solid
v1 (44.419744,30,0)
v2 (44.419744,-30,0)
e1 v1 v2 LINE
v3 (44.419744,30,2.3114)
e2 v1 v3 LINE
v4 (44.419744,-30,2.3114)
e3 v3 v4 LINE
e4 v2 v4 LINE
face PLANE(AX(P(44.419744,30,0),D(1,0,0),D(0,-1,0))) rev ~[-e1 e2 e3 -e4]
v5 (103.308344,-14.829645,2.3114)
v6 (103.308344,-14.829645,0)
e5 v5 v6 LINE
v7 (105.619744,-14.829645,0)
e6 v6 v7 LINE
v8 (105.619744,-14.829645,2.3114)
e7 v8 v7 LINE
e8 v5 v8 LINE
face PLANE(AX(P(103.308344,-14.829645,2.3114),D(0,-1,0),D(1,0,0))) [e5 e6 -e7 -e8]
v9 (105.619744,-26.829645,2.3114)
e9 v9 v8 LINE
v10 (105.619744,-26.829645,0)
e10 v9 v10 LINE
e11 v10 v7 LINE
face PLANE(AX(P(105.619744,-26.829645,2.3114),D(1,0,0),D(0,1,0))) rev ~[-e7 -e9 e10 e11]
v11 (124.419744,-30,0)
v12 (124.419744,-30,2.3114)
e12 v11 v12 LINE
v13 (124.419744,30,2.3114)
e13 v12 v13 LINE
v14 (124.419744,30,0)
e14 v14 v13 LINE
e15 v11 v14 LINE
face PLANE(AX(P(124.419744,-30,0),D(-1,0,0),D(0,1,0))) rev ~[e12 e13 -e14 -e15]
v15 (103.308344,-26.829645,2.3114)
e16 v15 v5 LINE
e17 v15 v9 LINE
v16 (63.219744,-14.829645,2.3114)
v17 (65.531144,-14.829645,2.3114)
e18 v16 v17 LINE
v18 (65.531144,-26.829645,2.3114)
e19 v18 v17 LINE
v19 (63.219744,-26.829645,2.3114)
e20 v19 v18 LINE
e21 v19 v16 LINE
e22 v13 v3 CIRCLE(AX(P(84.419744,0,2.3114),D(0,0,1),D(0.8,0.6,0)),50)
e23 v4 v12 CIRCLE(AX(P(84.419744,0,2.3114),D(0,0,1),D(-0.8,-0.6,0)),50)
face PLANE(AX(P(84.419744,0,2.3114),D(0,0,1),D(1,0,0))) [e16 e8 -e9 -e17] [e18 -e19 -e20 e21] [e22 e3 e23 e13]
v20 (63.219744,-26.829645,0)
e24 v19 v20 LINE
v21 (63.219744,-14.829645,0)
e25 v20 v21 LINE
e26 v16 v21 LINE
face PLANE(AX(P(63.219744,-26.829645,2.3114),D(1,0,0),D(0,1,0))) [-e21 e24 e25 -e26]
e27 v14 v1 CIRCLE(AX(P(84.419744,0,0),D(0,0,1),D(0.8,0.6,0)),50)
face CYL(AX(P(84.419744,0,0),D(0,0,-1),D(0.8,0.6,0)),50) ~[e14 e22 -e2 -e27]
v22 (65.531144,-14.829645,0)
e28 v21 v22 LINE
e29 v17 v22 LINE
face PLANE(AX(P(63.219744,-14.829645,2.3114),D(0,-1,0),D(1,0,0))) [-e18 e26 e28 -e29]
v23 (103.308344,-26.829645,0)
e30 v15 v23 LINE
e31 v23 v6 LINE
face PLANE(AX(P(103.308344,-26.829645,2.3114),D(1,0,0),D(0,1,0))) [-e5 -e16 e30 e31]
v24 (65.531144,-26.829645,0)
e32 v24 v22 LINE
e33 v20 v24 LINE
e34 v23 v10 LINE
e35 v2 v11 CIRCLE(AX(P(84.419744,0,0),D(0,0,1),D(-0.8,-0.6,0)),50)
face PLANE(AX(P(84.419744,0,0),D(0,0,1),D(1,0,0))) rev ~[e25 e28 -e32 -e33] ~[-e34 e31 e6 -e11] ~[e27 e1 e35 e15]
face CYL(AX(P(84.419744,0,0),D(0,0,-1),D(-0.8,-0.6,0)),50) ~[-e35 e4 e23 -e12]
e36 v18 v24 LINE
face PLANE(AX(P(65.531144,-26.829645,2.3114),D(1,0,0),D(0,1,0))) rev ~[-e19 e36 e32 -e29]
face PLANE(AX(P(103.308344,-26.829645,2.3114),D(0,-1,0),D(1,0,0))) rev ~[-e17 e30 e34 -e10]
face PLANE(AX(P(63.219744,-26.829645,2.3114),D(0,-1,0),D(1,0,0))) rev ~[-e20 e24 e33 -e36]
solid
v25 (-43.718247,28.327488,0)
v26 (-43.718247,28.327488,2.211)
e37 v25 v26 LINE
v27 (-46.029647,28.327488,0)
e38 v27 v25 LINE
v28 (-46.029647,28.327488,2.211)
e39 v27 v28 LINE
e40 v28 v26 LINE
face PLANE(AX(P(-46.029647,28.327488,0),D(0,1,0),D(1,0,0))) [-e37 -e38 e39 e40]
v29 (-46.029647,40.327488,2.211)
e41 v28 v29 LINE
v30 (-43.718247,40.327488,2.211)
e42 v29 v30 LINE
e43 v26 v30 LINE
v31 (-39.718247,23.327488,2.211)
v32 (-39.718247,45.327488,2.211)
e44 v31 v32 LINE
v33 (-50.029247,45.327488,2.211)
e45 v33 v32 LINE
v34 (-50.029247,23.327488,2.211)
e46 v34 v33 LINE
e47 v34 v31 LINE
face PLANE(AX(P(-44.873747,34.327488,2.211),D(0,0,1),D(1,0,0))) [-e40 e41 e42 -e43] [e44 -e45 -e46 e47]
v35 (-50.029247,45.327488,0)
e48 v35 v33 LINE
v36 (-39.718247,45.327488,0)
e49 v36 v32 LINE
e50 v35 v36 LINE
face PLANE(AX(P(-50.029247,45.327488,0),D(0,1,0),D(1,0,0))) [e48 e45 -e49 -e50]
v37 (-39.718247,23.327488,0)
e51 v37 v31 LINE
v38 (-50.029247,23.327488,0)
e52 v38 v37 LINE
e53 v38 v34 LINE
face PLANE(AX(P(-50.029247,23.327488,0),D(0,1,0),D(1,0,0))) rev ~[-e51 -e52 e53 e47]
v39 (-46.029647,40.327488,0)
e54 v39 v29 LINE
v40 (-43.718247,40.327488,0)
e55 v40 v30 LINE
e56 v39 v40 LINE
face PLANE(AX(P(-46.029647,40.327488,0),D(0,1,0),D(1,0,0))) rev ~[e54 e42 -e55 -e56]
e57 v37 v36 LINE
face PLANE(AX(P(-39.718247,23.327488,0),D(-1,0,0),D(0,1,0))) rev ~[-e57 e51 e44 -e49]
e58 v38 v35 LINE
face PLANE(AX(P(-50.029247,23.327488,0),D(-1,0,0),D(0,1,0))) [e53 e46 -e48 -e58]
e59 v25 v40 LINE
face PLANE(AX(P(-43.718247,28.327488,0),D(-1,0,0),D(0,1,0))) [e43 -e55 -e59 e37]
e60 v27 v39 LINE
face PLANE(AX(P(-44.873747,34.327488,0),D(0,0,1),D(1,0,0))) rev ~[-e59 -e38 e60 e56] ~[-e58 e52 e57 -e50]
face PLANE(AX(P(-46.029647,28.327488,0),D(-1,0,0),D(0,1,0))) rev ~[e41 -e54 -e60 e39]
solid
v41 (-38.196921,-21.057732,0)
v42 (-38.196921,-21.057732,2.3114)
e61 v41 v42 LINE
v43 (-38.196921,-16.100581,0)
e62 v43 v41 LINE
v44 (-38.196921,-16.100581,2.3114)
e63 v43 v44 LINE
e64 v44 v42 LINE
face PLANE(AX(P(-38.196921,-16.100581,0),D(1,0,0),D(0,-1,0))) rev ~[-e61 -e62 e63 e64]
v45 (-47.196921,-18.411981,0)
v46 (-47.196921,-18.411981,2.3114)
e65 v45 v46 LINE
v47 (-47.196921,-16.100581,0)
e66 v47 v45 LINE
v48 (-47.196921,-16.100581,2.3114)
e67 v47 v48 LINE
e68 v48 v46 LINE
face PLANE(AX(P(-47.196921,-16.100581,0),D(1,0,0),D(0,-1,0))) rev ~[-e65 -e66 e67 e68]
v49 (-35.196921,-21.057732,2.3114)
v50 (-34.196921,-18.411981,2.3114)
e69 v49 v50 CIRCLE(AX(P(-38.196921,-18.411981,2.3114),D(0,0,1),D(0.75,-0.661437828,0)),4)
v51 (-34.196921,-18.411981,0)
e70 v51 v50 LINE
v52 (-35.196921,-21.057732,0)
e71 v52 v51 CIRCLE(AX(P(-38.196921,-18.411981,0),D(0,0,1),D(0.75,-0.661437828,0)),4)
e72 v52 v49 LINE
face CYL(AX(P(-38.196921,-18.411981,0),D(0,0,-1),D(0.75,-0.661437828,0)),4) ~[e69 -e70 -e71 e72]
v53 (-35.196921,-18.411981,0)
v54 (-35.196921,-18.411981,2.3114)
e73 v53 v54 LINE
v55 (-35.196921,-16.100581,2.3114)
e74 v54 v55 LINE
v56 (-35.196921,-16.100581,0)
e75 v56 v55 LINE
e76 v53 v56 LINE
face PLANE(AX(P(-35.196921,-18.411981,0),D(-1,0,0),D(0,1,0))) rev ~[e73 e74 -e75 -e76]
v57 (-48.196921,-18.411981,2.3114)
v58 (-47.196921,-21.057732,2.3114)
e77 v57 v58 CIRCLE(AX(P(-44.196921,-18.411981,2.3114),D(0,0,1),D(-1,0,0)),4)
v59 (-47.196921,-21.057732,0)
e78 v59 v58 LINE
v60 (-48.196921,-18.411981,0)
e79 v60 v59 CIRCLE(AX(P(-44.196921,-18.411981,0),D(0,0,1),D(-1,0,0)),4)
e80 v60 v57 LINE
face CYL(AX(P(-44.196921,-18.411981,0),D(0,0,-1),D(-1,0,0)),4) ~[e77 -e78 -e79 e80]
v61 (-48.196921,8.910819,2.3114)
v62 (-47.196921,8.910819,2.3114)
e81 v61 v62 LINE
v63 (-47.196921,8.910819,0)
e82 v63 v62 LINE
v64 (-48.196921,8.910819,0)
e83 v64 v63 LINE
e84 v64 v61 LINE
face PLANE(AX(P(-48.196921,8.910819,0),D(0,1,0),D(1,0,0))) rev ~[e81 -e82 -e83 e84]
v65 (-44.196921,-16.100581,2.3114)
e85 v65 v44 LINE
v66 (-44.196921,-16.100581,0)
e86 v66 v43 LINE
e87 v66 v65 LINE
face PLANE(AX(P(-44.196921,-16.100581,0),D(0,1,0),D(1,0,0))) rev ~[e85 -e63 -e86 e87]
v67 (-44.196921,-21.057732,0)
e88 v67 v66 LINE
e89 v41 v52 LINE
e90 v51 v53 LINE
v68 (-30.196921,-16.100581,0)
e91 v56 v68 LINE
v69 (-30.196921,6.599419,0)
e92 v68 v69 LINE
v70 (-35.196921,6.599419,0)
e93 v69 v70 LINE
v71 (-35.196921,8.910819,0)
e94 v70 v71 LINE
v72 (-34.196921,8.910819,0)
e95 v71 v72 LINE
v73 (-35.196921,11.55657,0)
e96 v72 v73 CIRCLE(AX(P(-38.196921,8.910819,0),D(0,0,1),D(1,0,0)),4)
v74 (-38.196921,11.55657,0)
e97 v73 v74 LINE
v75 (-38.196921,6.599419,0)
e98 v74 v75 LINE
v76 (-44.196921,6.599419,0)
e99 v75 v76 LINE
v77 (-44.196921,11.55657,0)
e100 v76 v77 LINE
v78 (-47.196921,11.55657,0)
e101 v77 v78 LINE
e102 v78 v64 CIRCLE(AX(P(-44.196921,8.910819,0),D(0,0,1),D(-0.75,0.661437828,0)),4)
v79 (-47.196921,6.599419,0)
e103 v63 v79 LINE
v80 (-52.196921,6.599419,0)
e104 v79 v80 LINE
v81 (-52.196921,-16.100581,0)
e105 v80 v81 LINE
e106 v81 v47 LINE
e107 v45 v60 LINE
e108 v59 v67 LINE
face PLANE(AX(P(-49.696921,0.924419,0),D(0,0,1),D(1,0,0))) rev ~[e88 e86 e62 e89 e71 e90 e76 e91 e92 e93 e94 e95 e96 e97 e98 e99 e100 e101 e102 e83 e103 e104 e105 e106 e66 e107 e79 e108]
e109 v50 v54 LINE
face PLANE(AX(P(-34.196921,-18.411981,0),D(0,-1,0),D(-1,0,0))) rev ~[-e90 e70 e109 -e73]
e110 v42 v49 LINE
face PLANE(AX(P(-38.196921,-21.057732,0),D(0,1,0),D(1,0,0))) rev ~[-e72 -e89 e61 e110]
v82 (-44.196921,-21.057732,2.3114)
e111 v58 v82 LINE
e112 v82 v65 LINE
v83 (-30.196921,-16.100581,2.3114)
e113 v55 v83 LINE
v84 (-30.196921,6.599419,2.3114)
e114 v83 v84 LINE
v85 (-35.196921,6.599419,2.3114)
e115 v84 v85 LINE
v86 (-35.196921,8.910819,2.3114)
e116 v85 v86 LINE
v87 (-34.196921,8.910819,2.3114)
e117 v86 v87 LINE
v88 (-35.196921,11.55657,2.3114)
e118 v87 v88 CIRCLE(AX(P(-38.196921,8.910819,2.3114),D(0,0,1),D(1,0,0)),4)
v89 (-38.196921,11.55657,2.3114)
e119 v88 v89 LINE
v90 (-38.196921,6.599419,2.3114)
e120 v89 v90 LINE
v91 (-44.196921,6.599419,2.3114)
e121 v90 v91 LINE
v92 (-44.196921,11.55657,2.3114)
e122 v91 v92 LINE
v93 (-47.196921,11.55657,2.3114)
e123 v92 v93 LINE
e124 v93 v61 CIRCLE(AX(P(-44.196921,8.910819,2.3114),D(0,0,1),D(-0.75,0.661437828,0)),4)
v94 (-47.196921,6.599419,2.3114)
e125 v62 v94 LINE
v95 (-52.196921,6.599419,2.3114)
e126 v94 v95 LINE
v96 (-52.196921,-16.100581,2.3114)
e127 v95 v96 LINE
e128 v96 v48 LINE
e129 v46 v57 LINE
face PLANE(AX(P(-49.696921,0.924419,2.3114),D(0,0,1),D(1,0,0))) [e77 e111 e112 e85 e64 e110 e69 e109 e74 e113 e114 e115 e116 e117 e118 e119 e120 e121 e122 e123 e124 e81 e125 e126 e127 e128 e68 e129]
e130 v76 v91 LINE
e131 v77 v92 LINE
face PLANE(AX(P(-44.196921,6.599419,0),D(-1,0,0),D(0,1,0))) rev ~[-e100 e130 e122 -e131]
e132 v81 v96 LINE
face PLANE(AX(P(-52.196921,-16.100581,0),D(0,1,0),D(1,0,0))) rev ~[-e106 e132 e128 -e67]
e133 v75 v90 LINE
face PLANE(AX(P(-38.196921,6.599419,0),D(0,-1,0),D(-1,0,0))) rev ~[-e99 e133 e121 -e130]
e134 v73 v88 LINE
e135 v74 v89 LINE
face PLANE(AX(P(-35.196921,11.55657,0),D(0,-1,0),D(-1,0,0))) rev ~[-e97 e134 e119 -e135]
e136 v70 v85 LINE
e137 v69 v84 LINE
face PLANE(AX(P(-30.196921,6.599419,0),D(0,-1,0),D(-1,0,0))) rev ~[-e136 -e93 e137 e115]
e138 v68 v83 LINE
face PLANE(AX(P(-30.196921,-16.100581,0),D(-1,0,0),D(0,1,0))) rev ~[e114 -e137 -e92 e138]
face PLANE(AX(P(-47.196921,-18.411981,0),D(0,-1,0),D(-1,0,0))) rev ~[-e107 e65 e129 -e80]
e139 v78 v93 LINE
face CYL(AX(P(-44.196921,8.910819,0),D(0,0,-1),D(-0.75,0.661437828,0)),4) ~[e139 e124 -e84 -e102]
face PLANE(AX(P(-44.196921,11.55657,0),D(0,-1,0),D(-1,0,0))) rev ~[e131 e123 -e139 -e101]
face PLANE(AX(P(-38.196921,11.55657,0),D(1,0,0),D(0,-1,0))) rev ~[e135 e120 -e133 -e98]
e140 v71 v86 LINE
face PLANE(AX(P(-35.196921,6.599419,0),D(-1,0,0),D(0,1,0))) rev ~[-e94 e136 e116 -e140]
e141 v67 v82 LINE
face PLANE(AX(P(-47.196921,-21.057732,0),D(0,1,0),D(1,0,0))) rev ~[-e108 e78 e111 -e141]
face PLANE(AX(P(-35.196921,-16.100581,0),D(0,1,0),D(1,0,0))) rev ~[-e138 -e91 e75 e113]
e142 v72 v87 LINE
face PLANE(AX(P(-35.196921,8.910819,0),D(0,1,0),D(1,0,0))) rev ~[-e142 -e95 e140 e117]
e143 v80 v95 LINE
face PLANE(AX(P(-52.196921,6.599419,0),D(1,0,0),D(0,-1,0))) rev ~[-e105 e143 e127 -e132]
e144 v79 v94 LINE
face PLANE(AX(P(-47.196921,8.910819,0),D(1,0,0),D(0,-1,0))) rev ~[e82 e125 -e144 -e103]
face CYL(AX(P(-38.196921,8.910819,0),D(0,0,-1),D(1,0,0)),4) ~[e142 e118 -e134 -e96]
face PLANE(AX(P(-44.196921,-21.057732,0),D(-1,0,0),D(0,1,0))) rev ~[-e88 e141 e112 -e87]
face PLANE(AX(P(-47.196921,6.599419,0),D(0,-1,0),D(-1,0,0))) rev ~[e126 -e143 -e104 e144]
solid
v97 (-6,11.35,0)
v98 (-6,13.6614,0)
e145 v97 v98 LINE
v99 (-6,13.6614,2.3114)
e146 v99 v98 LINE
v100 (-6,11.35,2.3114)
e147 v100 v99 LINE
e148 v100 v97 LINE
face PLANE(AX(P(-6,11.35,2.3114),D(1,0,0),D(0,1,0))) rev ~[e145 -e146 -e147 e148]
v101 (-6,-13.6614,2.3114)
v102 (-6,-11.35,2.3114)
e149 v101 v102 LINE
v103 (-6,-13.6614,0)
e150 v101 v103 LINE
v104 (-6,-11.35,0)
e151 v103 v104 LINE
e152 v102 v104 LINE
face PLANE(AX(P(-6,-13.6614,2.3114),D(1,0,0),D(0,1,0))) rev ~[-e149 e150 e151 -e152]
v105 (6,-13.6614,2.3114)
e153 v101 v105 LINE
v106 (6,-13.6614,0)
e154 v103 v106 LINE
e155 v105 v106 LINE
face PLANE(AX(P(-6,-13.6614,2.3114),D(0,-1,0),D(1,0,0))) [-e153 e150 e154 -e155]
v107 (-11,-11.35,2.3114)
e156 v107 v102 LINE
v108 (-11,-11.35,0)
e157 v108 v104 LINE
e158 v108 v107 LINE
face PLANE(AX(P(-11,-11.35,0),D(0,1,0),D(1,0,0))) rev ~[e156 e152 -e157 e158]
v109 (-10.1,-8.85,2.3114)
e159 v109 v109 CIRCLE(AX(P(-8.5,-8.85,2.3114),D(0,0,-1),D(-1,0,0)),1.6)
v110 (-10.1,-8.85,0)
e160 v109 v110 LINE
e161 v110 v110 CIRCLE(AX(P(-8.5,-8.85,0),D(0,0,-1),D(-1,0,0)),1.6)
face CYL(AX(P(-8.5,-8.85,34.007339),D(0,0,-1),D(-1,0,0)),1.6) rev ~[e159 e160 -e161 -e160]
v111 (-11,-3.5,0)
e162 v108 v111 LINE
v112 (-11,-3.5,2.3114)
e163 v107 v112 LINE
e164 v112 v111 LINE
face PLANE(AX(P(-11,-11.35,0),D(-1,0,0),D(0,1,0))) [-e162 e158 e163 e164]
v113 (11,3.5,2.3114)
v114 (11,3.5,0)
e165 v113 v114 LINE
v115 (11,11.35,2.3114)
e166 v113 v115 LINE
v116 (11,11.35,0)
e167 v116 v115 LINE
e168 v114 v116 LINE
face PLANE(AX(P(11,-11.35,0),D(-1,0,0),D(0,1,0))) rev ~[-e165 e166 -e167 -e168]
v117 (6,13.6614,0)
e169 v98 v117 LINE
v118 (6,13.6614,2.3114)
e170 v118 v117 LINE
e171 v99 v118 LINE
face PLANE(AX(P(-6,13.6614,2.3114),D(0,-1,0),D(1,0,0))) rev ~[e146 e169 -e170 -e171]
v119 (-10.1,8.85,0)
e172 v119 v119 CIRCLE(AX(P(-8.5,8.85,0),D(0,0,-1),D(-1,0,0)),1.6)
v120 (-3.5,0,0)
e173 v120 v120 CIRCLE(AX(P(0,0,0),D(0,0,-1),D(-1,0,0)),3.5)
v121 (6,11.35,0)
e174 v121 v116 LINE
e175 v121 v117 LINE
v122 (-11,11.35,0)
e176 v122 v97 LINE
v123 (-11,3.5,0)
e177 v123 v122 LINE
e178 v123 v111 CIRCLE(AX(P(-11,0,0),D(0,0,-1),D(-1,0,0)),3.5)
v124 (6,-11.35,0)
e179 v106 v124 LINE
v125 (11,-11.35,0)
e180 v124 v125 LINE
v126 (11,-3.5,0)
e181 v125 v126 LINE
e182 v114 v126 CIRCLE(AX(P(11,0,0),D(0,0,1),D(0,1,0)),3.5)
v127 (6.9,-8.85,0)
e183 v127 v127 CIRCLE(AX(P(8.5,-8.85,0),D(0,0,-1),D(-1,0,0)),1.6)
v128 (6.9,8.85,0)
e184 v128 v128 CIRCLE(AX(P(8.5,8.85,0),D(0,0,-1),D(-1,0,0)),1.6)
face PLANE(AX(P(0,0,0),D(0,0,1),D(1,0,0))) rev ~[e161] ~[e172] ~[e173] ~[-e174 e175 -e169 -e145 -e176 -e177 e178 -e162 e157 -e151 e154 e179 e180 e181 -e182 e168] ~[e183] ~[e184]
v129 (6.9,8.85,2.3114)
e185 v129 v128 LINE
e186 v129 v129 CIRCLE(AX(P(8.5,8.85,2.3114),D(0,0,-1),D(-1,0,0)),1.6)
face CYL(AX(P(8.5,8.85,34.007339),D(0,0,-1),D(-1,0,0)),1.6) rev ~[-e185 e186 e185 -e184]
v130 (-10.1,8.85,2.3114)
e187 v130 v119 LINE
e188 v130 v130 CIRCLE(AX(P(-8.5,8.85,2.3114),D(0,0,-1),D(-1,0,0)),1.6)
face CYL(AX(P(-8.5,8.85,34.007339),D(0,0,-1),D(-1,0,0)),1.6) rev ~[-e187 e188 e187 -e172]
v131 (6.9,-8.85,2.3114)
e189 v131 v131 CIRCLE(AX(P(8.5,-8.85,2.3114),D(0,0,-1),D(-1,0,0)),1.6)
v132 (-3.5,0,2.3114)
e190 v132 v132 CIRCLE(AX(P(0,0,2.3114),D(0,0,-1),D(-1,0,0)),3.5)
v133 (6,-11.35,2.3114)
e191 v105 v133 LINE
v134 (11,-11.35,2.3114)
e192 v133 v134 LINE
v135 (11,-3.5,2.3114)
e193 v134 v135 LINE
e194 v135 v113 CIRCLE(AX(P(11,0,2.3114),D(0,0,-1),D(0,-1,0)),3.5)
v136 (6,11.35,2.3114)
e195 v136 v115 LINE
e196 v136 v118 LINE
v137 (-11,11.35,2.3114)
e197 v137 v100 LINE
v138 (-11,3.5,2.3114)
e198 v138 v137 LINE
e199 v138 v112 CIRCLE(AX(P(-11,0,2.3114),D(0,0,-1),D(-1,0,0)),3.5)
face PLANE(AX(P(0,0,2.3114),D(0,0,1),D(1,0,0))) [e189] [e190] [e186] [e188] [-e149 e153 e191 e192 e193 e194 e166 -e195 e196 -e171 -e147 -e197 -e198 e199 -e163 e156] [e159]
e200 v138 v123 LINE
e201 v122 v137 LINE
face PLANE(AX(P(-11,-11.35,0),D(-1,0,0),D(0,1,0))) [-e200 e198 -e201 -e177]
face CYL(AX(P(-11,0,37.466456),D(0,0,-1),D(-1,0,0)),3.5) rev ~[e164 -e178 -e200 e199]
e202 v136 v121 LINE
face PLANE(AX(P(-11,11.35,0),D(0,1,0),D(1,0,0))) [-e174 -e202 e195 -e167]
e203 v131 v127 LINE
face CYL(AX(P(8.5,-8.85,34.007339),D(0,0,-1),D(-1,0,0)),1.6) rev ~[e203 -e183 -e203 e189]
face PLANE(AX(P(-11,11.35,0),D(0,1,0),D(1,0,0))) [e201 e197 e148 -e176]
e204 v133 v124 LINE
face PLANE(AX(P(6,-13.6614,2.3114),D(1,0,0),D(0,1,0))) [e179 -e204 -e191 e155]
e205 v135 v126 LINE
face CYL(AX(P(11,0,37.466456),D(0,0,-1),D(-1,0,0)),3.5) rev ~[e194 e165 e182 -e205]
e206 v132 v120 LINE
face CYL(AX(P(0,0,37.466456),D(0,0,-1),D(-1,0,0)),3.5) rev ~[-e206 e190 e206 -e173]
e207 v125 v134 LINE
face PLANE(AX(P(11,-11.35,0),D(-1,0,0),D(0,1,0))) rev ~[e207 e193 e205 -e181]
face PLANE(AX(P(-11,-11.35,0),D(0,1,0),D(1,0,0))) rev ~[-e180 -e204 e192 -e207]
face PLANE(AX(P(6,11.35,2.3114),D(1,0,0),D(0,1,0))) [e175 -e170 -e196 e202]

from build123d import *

# Parameters (mm, degrees)
F0_W      = 22
F0_H      = 22.7
F1_DEPTH  = 2.3114
F3_D      = 3.2
F4_W      = 12
F4_H      = 2.3114
F5_DEPTH  = 2.3114
F8_D      = 7
F10_DEPTH = 2.3114
F11_W     = 2.3114
F11_H     = 12
F12_DEPTH = 2.3124
F13_W     = 5
F13_H     = 11.35
F13_W_2   = 3
F14_DEPTH = 2.3114
F15_W     = 10.311
F15_H     = 22
F15_W_2   = 2.3114
F15_H_2   = 12
F16_DEPTH = 2.211


# Not quite as in the source:
# - a feature names something its author has since deleted; it is built from what else it names


with BuildPart() as f1:
    # F0 (on Top) → F1 (new body)
    with BuildSketch(Plane.XY):
        Rectangle(F0_W, F0_H)
    extrude(amount=F1_DEPTH)

    # F3 (through all)
    with Locations(Plane.XY.offset(2.3114)):
        with Locations((-8.5, 8.85), (8.5, 8.85), (8.5, -8.85), (-8.5, -8.85)):
            Hole(F3_D / 2)


with BuildPart() as f5:
    # F4 (on face) → F5 (new body)
    with BuildSketch(Plane.XY.offset(2.3114)):
        with Locations((0, 12.5057)):
            Rectangle(F4_W, F4_H)
    extrude(amount=-F5_DEPTH)


with BuildPart() as f5b:
    # F4 (on face) → F5, piece 2 (new body)
    with BuildSketch(Plane.XY.offset(2.3114)):
        with Locations((0, -12.5057)):
            Rectangle(F4_W, F4_H)
    extrude(amount=-F5_DEPTH)


with BuildPart() as f1_1:
    add(f1.part)

    # F6: union F5, F5b
    add(f5.part)
    add(f5b.part)

    # F8 (through all)
    with Locations(Plane.XY.offset(2.3114)):
        with Locations((-11, 0), (11, 0), (0, 0)):
            Hole(F8_D / 2)


with BuildPart() as f10:
    # F9 (on Top) → F10 (new body)
    with BuildSketch(Plane.XY):
        with BuildLine():
            Line((124.4197436075, -30), (124.4197436075, 30))
            ThreePointArc((124.4197436075, 30), (106.7804233825, 44.72135955), (84.4197436075, 50))
            ThreePointArc((84.4197436075, 50), (62.0590638325, 44.72135955), (44.4197436075, 30))
            Line((44.4197436075, 30), (44.4197436075, -30))
            ThreePointArc((44.4197436075, -30), (62.0590638325, -44.72135955), (84.4197436075, -50))
            ThreePointArc((84.4197436075, -50), (106.7804233825, -44.72135955), (124.4197436075, -30))
        make_face()
    extrude(amount=F10_DEPTH)

    # F11 (on face) → F12 (cut, through all)
    with BuildSketch(Plane.XY.offset(2.3114)):
        with Locations((64.3754436075, -20.8296453593)):
            Rectangle(F11_W, F11_H)
        with Locations((104.4640436075, -20.8296453593)):
            Rectangle(F11_W, F11_H)
    extrude(amount=-F12_DEPTH, mode=Mode.SUBTRACT)


with BuildPart() as f14:
    # F13 (on Top) → F14 (new body)
    with BuildSketch(Plane.XY):
        with Locations((-49.6969209611, 0.9244190347)):
            Rectangle(F13_W, F13_H)
        with Locations((-45.6969209611, 0.9244190347)):
            Rectangle(F13_W_2, F13_H)
        with Locations((-39.6969209611, 0.9244190347)):
            Rectangle(F13_W_2, F13_H)
        with Locations((-39.6969209611, -10.4255809653)):
            Rectangle(F13_W_2, F13_H)
        with Locations((-49.6969209611, -10.4255809653)):
            Rectangle(F13_W, F13_H)
        with Locations((-32.6969209611, -10.4255809653)):
            Rectangle(F13_W, F13_H)
        with Locations((-32.6969209611, 0.9244190347)):
            Rectangle(F13_W, F13_H)
        with BuildLine():
            Line((-35.1969209611, -16.1005809653), (-38.1969209611, -16.1005809653))
            Line((-38.1969209611, -16.1005809653), (-38.1969209611, -18.4119809653))
            Line((-38.1969209611, -18.4119809653), (-38.1969209611, -21.0577322764))
            Line((-38.1969209611, -21.0577322764), (-35.1969209611, -21.0577322764))
            ThreePointArc((-35.1969209611, -21.0577322764), (-34.4552635744, -19.8261945277), (-34.1969209611, -18.4119809653))
            Line((-34.1969209611, -18.4119809653), (-35.1969209611, -18.4119809653))
            Line((-35.1969209611, -18.4119809653), (-35.1969209611, -16.1005809653))
        make_face()
        with Locations((-45.6969209611, -10.4255809653)):
            Rectangle(F13_W_2, F13_H)
        with Locations((-36.6969209611, 0.9244190347)):
            Rectangle(F13_W_2, F13_H)
        with Locations((-42.6969209611, 0.9244190347)):
            Rectangle(F13_W_2, F13_H)
        with Locations((-42.6969209611, -10.4255809653)):
            Rectangle(F13_W_2, F13_H)
        with Locations((-36.6969209611, -10.4255809653)):
            Rectangle(F13_W_2, F13_H)
        with BuildLine():
            Line((-47.1969209611, 8.9108190347), (-47.1969209611, 6.5994190347))
            Line((-47.1969209611, 6.5994190347), (-44.1969209611, 6.5994190347))
            Line((-44.1969209611, 6.5994190347), (-44.1969209611, 8.9108190347))
            Line((-44.1969209611, 8.9108190347), (-44.1969209611, 11.5565703458))
            Line((-44.1969209611, 11.5565703458), (-47.1969209611, 11.5565703458))
            ThreePointArc((-47.1969209611, 11.5565703458), (-47.9385783479, 10.3250325971), (-48.1969209611, 8.9108190347))
            Line((-48.1969209611, 8.9108190347), (-47.1969209611, 8.9108190347))
        make_face()
        with BuildLine():
            Line((-38.1969209611, 8.9108190347), (-38.1969209611, 6.5994190347))
            Line((-38.1969209611, 6.5994190347), (-35.1969209611, 6.5994190347))
            Line((-35.1969209611, 6.5994190347), (-35.1969209611, 8.9108190347))
            Line((-35.1969209611, 8.9108190347), (-34.1969209611, 8.9108190347))
            ThreePointArc((-34.1969209611, 8.9108190347), (-34.4552635744, 10.3250325971), (-35.1969209611, 11.5565703458))
            Line((-35.1969209611, 11.5565703458), (-38.1969209611, 11.5565703458))
            Line((-38.1969209611, 11.5565703458), (-38.1969209611, 8.9108190347))
        make_face()
        with BuildLine():
            Line((-44.1969209611, -16.1005809653), (-47.1969209611, -16.1005809653))
            Line((-47.1969209611, -16.1005809653), (-47.1969209611, -18.4119809653))
            Line((-47.1969209611, -18.4119809653), (-48.1969209611, -18.4119809653))
            ThreePointArc((-48.1969209611, -18.4119809653), (-47.9385783479, -19.8261945277), (-47.1969209611, -21.0577322764))
            Line((-47.1969209611, -21.0577322764), (-44.1969209611, -21.0577322764))
            Line((-44.1969209611, -21.0577322764), (-44.1969209611, -18.4119809653))
            Line((-44.1969209611, -18.4119809653), (-44.1969209611, -16.1005809653))
        make_face()
    extrude(amount=F14_DEPTH)


with BuildPart() as f16:
    # F15 (on Top) → F16 (new body)
    with BuildSketch(Plane.XY):
        with Locations((-44.8737465275, 34.3274882433)):
            Rectangle(F15_W, F15_H)
        with Locations((-44.8739465275, 34.3274882433)):
            Rectangle(F15_W_2, F15_H_2, mode=Mode.SUBTRACT)
    extrude(amount=F16_DEPTH)


solid = Compound([f1_1.part, f10.part, f14.part, f16.part])
